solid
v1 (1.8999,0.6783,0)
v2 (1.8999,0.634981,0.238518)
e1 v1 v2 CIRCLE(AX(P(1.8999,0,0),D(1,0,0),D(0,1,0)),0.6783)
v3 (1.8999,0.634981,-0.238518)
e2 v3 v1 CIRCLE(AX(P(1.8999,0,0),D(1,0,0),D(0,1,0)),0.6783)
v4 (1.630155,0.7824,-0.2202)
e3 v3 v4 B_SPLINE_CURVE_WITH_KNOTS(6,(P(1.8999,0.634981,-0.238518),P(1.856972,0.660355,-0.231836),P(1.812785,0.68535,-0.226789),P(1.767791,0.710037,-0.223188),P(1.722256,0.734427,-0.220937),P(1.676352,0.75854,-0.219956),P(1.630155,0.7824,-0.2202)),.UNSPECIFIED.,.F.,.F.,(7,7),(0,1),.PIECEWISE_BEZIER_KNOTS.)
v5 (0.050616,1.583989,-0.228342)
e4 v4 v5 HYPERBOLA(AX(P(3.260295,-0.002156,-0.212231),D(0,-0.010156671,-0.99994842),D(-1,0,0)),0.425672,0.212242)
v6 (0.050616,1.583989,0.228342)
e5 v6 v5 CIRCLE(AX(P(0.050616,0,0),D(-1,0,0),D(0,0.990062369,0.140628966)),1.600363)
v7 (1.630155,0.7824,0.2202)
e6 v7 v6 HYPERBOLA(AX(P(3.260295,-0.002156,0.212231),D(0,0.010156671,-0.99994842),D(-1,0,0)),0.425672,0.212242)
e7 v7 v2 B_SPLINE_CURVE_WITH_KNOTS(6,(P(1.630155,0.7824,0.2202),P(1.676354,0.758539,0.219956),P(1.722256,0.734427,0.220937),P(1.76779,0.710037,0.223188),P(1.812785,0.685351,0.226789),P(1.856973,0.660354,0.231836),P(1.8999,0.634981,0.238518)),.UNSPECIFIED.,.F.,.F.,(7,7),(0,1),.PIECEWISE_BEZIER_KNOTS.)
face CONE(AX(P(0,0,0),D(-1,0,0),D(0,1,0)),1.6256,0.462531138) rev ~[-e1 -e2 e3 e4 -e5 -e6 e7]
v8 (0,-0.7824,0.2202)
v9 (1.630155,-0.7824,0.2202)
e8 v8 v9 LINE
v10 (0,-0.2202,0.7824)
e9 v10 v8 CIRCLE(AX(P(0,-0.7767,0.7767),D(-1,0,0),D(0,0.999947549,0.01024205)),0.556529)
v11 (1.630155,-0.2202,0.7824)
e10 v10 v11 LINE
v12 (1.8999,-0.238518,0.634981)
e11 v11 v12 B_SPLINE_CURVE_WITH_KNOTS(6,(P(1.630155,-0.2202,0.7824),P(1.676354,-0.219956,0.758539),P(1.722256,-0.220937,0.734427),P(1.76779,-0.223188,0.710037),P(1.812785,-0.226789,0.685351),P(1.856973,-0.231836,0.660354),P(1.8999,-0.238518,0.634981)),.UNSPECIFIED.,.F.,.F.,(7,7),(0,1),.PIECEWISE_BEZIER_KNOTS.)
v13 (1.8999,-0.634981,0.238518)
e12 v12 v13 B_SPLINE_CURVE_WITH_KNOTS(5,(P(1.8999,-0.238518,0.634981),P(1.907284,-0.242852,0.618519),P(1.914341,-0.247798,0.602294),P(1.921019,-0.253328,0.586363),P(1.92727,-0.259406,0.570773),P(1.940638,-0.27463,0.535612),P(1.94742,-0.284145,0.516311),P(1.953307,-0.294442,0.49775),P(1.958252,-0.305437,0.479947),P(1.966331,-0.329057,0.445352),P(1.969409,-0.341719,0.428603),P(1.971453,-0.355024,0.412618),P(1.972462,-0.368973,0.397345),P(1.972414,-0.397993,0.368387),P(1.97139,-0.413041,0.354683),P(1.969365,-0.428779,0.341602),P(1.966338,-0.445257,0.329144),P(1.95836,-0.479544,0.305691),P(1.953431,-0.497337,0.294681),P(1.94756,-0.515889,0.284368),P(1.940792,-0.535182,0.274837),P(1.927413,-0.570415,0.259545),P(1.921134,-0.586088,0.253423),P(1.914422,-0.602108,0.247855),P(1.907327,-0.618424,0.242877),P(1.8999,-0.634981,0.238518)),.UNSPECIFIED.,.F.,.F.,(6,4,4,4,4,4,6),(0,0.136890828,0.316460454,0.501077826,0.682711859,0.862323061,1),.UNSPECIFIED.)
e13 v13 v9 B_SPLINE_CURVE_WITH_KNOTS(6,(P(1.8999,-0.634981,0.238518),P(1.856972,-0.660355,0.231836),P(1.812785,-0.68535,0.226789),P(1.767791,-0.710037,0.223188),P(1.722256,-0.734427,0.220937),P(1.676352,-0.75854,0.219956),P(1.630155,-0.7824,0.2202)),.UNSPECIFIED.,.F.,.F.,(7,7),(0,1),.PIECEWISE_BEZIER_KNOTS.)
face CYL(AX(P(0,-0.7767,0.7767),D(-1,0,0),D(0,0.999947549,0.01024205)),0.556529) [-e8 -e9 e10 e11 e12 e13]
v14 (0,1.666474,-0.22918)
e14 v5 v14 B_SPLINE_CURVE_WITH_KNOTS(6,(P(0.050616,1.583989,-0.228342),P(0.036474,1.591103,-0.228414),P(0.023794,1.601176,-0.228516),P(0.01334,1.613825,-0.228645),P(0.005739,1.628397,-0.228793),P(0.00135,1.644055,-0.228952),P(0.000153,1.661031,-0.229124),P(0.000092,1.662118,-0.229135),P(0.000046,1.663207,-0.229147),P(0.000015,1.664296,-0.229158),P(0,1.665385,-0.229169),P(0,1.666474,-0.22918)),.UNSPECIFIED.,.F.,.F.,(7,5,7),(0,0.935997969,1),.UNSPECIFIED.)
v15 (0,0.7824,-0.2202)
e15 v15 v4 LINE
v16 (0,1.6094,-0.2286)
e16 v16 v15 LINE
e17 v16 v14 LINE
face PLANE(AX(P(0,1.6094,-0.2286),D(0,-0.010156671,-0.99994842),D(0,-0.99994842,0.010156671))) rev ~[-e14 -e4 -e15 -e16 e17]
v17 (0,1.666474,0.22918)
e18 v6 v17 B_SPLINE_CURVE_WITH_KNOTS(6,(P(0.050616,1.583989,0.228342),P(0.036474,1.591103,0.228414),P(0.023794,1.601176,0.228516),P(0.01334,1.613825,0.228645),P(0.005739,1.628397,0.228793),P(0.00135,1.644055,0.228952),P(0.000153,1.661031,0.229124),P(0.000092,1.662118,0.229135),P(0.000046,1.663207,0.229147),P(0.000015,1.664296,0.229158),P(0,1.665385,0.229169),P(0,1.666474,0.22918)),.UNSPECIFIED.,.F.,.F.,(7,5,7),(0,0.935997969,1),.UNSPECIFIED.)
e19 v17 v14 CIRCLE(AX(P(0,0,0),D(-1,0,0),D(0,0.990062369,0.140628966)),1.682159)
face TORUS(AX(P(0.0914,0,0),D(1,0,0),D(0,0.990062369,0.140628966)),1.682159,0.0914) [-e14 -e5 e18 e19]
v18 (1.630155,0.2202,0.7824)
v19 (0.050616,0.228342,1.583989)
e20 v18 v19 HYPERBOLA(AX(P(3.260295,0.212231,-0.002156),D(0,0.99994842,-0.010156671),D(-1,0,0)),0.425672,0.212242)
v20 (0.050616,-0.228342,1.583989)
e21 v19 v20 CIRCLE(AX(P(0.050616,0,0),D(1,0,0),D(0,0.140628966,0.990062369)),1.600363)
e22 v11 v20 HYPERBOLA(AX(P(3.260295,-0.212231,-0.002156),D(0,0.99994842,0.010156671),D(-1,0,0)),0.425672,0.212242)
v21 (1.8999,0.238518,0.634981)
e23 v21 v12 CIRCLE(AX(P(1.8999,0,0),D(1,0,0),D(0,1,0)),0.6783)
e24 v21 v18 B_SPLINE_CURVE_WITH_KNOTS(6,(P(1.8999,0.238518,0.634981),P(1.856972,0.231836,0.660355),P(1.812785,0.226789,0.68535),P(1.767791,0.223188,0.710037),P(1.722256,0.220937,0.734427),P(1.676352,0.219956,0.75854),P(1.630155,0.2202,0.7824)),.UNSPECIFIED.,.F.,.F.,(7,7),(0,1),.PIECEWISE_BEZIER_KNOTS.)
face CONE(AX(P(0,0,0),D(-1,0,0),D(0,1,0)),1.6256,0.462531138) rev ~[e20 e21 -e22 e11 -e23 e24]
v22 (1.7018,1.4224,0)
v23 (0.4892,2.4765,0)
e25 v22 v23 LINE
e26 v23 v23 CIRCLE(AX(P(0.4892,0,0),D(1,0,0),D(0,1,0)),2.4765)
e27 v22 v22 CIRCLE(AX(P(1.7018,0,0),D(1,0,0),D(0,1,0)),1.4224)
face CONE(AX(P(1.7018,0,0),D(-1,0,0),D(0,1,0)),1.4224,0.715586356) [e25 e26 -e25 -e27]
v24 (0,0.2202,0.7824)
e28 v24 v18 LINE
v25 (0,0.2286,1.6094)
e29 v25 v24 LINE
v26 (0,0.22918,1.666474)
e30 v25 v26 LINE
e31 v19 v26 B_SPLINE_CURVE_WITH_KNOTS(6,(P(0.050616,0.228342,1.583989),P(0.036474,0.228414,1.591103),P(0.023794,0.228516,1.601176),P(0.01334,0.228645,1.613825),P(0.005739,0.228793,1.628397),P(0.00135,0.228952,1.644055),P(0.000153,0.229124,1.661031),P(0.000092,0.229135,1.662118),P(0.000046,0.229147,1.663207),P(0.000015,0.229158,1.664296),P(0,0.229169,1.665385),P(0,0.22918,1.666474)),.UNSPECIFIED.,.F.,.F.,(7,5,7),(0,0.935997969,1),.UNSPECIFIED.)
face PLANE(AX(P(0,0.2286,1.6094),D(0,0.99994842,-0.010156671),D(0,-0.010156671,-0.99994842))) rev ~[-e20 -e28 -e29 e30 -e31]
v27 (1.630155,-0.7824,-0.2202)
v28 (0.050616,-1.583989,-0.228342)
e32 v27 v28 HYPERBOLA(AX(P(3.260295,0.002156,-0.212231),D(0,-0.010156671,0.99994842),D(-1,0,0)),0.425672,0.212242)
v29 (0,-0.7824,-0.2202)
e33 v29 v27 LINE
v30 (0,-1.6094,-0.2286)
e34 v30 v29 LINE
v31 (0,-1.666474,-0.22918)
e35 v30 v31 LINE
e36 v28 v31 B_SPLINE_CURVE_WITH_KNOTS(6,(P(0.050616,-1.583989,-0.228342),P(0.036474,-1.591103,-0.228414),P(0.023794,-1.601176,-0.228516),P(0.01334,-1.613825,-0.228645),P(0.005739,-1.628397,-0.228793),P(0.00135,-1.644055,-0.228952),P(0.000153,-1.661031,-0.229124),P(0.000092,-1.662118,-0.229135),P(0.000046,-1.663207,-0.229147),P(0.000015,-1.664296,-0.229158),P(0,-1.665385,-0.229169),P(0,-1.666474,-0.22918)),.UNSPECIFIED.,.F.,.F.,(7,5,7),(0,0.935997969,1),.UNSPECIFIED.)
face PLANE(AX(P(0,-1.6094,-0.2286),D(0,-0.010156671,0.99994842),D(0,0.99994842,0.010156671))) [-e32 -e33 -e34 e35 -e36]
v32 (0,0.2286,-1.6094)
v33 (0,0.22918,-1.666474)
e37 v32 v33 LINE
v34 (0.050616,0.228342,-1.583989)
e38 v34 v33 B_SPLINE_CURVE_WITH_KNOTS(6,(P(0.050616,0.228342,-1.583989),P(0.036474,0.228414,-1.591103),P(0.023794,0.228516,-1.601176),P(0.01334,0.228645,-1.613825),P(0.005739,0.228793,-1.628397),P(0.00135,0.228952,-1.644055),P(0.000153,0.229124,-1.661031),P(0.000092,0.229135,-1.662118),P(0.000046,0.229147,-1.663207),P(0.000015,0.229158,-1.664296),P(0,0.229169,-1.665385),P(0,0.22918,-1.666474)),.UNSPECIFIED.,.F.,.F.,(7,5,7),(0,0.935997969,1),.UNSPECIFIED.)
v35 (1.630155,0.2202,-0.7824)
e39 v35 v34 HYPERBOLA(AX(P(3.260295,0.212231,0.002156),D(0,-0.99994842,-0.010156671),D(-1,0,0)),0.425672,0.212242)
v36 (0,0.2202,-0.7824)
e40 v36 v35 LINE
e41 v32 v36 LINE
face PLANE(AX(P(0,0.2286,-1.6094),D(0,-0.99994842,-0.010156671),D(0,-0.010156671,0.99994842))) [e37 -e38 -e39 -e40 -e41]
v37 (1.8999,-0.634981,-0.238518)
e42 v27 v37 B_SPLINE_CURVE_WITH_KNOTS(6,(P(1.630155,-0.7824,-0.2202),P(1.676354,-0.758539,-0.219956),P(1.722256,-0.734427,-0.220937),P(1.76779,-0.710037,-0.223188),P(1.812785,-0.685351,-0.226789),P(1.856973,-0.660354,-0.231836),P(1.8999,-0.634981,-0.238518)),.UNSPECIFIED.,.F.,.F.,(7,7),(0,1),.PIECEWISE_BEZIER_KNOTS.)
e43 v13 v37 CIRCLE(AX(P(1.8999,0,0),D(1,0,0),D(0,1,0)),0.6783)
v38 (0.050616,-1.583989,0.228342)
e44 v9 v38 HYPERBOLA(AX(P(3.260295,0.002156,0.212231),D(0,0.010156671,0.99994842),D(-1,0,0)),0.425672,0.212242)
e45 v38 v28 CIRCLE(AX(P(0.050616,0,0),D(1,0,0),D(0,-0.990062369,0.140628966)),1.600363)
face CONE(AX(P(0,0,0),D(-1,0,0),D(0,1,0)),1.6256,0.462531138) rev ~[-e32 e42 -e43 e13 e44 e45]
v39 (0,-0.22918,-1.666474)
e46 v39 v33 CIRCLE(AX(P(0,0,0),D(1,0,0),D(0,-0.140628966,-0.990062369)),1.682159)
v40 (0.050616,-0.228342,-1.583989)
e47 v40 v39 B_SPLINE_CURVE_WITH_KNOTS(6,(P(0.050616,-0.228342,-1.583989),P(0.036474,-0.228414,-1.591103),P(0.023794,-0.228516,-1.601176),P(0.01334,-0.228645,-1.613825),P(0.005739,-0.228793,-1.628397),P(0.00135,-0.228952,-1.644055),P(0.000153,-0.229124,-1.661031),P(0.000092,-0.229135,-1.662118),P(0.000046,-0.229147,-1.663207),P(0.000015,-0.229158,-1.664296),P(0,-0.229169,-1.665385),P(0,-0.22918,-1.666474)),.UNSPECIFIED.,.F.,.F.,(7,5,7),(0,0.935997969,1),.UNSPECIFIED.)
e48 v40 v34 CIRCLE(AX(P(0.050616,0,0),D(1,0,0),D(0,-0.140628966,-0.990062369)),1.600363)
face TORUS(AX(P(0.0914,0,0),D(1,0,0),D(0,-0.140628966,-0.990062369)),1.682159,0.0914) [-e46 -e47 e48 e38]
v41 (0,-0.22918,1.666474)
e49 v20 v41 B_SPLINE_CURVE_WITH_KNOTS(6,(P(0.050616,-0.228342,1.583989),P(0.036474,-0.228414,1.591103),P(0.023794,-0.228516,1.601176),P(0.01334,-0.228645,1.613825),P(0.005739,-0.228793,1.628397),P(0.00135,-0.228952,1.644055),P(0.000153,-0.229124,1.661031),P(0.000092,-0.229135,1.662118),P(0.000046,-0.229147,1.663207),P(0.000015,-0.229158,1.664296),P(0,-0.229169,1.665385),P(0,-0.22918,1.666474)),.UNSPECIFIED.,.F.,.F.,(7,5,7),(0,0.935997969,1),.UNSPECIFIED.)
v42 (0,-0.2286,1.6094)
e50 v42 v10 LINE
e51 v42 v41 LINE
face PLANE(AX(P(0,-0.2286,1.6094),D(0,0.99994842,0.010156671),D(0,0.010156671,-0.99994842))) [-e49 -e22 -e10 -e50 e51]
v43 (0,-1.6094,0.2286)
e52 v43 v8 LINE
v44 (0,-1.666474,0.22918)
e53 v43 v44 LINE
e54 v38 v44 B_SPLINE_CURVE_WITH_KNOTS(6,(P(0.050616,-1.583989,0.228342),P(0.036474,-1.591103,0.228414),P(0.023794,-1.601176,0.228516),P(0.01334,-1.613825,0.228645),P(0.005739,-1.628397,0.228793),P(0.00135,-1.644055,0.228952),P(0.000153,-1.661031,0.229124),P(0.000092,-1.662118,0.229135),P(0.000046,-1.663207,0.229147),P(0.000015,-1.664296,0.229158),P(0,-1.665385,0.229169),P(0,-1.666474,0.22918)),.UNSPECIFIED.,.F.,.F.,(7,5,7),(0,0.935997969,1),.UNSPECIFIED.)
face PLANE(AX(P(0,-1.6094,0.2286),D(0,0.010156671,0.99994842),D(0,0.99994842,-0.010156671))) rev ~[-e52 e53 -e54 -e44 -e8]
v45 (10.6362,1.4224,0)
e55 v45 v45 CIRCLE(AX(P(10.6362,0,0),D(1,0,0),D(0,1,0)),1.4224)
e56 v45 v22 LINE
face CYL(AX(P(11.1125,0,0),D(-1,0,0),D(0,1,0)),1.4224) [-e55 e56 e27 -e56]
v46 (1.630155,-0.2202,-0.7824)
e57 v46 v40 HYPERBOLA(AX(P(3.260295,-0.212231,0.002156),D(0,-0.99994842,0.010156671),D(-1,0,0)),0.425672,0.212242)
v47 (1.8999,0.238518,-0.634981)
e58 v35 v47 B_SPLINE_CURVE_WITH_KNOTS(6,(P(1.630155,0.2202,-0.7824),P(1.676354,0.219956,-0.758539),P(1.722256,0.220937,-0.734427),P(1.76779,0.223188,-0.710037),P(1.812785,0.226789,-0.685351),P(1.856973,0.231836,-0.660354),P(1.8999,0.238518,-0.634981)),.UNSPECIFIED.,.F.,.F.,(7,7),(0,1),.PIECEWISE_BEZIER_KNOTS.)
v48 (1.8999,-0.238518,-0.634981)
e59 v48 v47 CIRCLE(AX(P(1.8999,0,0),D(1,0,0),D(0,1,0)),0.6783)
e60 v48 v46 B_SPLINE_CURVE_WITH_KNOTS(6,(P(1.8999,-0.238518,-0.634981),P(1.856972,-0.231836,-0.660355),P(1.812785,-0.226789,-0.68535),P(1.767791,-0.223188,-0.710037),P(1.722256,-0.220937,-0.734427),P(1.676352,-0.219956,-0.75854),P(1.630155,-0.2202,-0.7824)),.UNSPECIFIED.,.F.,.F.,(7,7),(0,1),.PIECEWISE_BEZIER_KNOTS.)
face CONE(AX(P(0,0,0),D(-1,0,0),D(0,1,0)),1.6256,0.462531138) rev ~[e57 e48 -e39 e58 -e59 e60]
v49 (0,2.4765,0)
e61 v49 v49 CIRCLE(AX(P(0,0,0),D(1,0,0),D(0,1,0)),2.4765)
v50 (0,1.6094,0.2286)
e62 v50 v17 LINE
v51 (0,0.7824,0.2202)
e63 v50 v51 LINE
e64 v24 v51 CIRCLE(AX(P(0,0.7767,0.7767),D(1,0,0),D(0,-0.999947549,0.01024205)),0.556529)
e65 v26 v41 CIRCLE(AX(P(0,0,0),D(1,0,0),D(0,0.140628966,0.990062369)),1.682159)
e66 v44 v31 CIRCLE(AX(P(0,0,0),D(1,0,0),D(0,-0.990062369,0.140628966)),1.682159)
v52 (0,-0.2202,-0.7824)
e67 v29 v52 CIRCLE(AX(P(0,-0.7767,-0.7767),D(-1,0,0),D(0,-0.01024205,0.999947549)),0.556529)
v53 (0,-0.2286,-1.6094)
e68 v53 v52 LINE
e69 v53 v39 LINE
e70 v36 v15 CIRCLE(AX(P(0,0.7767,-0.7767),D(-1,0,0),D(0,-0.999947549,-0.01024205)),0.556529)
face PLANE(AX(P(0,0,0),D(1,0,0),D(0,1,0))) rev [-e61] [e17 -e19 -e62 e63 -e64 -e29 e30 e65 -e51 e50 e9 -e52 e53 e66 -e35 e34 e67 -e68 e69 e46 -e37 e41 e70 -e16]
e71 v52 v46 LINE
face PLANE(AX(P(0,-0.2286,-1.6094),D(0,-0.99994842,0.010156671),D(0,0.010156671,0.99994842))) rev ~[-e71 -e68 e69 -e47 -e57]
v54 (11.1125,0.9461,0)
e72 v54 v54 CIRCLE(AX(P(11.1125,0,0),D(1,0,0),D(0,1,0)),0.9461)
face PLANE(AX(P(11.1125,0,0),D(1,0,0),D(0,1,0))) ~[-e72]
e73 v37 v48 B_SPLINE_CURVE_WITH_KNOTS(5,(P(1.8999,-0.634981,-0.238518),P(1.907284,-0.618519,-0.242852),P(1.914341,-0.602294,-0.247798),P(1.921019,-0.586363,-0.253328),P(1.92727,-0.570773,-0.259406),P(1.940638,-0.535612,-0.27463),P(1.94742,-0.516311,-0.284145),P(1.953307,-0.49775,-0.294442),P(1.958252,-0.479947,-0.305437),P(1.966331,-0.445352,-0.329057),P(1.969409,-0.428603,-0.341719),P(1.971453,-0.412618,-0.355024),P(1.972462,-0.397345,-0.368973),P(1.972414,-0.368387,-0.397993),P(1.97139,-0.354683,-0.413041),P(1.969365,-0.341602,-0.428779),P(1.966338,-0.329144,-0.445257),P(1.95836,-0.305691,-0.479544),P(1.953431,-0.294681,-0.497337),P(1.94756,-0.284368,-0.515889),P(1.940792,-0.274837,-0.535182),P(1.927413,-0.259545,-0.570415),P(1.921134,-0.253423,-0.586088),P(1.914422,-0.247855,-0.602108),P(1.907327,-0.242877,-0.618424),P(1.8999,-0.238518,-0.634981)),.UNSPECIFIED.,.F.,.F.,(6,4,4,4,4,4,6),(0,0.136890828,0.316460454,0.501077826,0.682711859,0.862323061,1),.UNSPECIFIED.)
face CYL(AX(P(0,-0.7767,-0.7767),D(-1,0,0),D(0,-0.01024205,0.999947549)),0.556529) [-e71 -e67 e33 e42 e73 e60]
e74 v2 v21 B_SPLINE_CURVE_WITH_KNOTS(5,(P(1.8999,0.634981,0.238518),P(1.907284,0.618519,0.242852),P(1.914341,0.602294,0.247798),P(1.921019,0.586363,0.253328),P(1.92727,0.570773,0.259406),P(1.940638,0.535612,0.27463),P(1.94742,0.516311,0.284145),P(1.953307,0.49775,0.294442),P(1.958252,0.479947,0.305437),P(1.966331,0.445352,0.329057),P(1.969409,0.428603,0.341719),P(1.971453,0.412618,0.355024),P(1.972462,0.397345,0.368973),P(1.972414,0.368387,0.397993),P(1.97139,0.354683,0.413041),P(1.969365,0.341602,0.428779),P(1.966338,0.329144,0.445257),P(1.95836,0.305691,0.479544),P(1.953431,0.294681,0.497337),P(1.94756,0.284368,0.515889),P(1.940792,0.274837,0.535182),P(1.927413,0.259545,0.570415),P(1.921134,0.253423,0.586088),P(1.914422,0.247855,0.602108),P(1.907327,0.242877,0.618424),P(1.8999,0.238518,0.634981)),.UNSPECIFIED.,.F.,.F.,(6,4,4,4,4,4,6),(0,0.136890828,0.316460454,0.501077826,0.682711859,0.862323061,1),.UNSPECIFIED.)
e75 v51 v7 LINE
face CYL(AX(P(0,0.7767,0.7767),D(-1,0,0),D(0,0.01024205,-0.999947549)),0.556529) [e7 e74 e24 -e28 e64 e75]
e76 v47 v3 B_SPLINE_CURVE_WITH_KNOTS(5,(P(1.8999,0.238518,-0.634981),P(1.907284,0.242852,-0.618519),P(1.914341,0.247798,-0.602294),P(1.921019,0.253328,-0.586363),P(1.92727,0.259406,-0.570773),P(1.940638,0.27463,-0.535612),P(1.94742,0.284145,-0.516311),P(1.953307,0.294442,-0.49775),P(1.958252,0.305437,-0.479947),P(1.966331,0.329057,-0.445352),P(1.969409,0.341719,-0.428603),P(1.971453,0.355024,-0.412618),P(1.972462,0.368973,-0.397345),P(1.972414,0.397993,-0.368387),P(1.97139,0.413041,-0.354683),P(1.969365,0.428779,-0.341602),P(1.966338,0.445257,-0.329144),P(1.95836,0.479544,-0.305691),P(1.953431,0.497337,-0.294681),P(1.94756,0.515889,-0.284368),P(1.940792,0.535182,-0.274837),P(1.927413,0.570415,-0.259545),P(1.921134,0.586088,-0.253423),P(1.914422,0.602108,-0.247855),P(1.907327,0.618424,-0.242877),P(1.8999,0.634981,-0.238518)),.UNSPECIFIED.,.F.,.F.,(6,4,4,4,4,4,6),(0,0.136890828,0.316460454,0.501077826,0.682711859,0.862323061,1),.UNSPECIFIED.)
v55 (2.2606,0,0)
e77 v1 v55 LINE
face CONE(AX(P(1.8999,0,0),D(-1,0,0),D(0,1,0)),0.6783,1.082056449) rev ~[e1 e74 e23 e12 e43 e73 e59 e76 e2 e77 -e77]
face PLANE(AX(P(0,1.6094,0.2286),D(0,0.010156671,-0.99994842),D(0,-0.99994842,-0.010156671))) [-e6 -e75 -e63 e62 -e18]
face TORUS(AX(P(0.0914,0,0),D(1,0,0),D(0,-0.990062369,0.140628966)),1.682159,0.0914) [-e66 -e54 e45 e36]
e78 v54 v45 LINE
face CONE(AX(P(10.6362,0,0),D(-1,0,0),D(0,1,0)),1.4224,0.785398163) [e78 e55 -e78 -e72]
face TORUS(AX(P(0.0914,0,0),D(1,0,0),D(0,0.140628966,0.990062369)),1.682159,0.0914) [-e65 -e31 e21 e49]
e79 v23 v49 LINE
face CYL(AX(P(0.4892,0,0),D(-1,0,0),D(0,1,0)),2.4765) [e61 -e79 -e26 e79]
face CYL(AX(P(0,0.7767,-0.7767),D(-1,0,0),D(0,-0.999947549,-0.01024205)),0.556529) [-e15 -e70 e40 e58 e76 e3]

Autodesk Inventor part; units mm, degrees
ref_plane "YZ Plane" through (0, 0, 0) normal (1, 0, 0) x (0, 1, 0)
ref_plane "XZ Plane" through (0, 0, 0) normal (0, 1, 0) x (-1, 0, 0)
sketch "Sketch1" plane through (0, 0, 0) normal (0, 0, 1) x (1, 0, 0)
  line L0 (2.2606, 0) -> (11.1125, 0)
  line L1 (11.1125, 0) -> (11.1125, 1.4224)
  line L2 (11.1125, 1.4224) -> (1.7018, 1.4224)
  line L3 (0.4892, 2.4765) -> (0, 2.4765)
  line L4 (-2.2225, 0) -> (13.335, 0) projected
  line L5 (0, -0.4953) -> (0, 2.9718) projected
  line L6 (0, 1.6256) -> (1.8999, 0.6783)
  line L7 (1.8999, 0.6783) -> (2.2606, 0)
  line L8 (1.7018, 1.4224) -> (0.4892, 2.4765)
  line L9 (0, 2.4765) -> (0, 1.6256)
  dimension "d2" = 2.8448
  dimension "d3" = 4.953
  dimension "d4" = 2.2606
  dimension "d5" = 3.2512
  dimension "d6" = 26.5
  dimension "d7" = 62
  dimension "d13" = 41
  dimension "d14" = 1.7018
  dimension "d15" = 11.1125
revolve "Body" add sketch "Sketch1" angle 360 about axis through (2.2606, 0, 0) along (1, 0, 0) contours L7 L6 L5 L3 L8 L2 L1 L0
sketch "Sketch2" plane through (0, 0, 0) normal (-1, 0, 0) x (0, 0, 1)
  line L0 (0, -3.4671) -> (0, 3.4671) projected
  line L1 (-3.4671, 0) -> (3.4671, 0) projected
  line L2 (0, 1.6256) -> (0, 0) construction
  line L3 (0, 0) -> (1.6256, 0) construction
  arc A0 (0.5419, 0) -> (0, 0.5419) centre (0, 0) ccw
  line L4 (0, 0) -> (0.7947, 0.7947) construction
  arc A1 (0.8128, 0) -> (0, 0.8128) centre (0, 0) ccw construction
  line L5 (0.2286, 1.6094) -> (0.2202, 0.7824)
  line L6 (1.6094, 0.2286) -> (0.7824, 0.2202)
  arc A2 (0.2202, 0.7824) -> (0.7824, 0.2202) centre (0.7767, 0.7767) ccw
  arc A3 (1.6256, 0) -> (1.6094, 0.2286) centre (0, 0) ccw
  arc A4 (0.2286, 1.6094) -> (0, 1.6256) centre (0, 0) ccw
  arc A5 (1.6094, 0.2286) -> (0.2286, 1.6094) centre (0, 0) ccw
  line L7 (0.2286, -1.6094) -> (0.2202, -0.7824)
  line L8 (1.6094, -0.2286) -> (0.7824, -0.2202)
  arc A6 (0.7824, -0.2202) -> (0.2202, -0.7824) centre (0.7767, -0.7767) ccw
  arc A7 (1.6094, -0.2286) -> (1.6256, 0) centre (0, 0) ccw
  arc A8 (0, -1.6256) -> (0.2286, -1.6094) centre (0, 0) ccw
  arc A9 (0.2286, -1.6094) -> (1.6094, -0.2286) centre (0, 0) ccw
  line L9 (-0.2286, 1.6094) -> (-0.2202, 0.7824)
  line L10 (-1.6094, 0.2286) -> (-0.7824, 0.2202)
  arc A10 (-0.7824, 0.2202) -> (-0.2202, 0.7824) centre (-0.7767, 0.7767) ccw
  arc A11 (-1.6094, 0.2286) -> (-1.6256, 0) centre (0, 0) ccw
  arc A12 (0, 1.6256) -> (-0.2286, 1.6094) centre (0, 0) ccw
  arc A13 (-0.2286, 1.6094) -> (-1.6094, 0.2286) centre (0, 0) ccw
  arc A14 (-1.6094, -0.2286) -> (-0.2286, -1.6094) centre (0, 0) ccw
  arc A15 (-0.2286, -1.6094) -> (0, -1.6256) centre (0, 0) ccw
  arc A16 (-1.6256, 0) -> (-1.6094, -0.2286) centre (0, 0) ccw
  line L11 (-1.6094, -0.2286) -> (-0.7824, -0.2202)
  arc A17 (-0.2202, -0.7824) -> (-0.7824, -0.2202) centre (-0.7767, -0.7767) ccw
  line L12 (-0.2286, -1.6094) -> (-0.2202, -0.7824)
  dimension "d18" = 45
  dimension "d19" = 1.0837
  dimension "d20" = 1.6256
  dimension "d21" = 3.2512
  dimension "d22" = 0.2286
extrude "Slot" add sketch "Sketch2" against normal up to next contours A2 L5 A5 L6 | L9 A10 L10 A13 | L7 A6 L8 A9 | A14 L11 A17 L12
fillet "Fillet1" radius 0.0914 4 edges at (0, 1.6256, 0) (0, 0, 1.6256) (0, -1.6256, 0) (0, 0, -1.6256)
thread "Thread" size "4-40 UNC" class "2A" standard "ANSI Unified Screw Threads" length 7.8232
chamfer "Chamfer1" distance 0.4763 distance2 0.4763 1 edges at (11.1125, -1.4224, 0) measured on face at (11.1125, 0.2736, 0.8712)
ref_plane "Work Plane2" through (2.032, 0, 0) normal (0, 1, 0) x (1, 0, 0)
equation "\"d2\" = GD"
equation "\"d3\" = KOD"
equation "\"d4\" = INTI"
equation "\"d5\" = SDM"
equation "\"d13\" = 0.5 * SEWI"
equation "\"d14\" = KOH"
equation "\"d15\" = NLG"
equation "\"d19\" = 0.333333 * SDM"
equation "\"d20\" = 0.5 * SDM"
equation "\"d21\" = SDM"
equation "\"d22\" = 0.5 * SBR"
equation "\"d45\" = INTI"
equation "\"d25\" = 0.2 * SBR"
equation "\"d9\" = GEL"
equation "\"d11\" = -0.5 * SPD + 0.5 * GD"
equation "\"d12\" = GUL"
equation "\"GD\" = NND"
equation "\"NLG\" = 11.1125"
equation "\"GEL\" = 7.8232"
equation "\"KOD\" = 4.953"
equation "\"KOH\" = 1.7018"
equation "\"SDM\" = 3.2512"
equation "\"INTI\" = 2.2606"
equation "\"SBR\" = 0.4572"
equation "\"GUL\" = 0.75 * GAL"
equation "\"SPD\" = 1.8923"
equation "\"SEWI\" = 82deg"
equation "\"d0\" = NLG"
equation "\"d1\" = KOH"
equation "\"d17\" = SDM"
equation "\"TOA\" = 30deg"
equation "\"THREADDIA\" = 2.8448"
equation "\"BDM\" = NND"
equation "\"NND\" = 2.8448"
equation "\"GAL\" = 0.635"
equation "\"GD1\" = SPD"
properties part number "ANSI B18.6.3 - 4-40 x 7/16, CRFCHMSTII(5)" material "Steel, Mild"
